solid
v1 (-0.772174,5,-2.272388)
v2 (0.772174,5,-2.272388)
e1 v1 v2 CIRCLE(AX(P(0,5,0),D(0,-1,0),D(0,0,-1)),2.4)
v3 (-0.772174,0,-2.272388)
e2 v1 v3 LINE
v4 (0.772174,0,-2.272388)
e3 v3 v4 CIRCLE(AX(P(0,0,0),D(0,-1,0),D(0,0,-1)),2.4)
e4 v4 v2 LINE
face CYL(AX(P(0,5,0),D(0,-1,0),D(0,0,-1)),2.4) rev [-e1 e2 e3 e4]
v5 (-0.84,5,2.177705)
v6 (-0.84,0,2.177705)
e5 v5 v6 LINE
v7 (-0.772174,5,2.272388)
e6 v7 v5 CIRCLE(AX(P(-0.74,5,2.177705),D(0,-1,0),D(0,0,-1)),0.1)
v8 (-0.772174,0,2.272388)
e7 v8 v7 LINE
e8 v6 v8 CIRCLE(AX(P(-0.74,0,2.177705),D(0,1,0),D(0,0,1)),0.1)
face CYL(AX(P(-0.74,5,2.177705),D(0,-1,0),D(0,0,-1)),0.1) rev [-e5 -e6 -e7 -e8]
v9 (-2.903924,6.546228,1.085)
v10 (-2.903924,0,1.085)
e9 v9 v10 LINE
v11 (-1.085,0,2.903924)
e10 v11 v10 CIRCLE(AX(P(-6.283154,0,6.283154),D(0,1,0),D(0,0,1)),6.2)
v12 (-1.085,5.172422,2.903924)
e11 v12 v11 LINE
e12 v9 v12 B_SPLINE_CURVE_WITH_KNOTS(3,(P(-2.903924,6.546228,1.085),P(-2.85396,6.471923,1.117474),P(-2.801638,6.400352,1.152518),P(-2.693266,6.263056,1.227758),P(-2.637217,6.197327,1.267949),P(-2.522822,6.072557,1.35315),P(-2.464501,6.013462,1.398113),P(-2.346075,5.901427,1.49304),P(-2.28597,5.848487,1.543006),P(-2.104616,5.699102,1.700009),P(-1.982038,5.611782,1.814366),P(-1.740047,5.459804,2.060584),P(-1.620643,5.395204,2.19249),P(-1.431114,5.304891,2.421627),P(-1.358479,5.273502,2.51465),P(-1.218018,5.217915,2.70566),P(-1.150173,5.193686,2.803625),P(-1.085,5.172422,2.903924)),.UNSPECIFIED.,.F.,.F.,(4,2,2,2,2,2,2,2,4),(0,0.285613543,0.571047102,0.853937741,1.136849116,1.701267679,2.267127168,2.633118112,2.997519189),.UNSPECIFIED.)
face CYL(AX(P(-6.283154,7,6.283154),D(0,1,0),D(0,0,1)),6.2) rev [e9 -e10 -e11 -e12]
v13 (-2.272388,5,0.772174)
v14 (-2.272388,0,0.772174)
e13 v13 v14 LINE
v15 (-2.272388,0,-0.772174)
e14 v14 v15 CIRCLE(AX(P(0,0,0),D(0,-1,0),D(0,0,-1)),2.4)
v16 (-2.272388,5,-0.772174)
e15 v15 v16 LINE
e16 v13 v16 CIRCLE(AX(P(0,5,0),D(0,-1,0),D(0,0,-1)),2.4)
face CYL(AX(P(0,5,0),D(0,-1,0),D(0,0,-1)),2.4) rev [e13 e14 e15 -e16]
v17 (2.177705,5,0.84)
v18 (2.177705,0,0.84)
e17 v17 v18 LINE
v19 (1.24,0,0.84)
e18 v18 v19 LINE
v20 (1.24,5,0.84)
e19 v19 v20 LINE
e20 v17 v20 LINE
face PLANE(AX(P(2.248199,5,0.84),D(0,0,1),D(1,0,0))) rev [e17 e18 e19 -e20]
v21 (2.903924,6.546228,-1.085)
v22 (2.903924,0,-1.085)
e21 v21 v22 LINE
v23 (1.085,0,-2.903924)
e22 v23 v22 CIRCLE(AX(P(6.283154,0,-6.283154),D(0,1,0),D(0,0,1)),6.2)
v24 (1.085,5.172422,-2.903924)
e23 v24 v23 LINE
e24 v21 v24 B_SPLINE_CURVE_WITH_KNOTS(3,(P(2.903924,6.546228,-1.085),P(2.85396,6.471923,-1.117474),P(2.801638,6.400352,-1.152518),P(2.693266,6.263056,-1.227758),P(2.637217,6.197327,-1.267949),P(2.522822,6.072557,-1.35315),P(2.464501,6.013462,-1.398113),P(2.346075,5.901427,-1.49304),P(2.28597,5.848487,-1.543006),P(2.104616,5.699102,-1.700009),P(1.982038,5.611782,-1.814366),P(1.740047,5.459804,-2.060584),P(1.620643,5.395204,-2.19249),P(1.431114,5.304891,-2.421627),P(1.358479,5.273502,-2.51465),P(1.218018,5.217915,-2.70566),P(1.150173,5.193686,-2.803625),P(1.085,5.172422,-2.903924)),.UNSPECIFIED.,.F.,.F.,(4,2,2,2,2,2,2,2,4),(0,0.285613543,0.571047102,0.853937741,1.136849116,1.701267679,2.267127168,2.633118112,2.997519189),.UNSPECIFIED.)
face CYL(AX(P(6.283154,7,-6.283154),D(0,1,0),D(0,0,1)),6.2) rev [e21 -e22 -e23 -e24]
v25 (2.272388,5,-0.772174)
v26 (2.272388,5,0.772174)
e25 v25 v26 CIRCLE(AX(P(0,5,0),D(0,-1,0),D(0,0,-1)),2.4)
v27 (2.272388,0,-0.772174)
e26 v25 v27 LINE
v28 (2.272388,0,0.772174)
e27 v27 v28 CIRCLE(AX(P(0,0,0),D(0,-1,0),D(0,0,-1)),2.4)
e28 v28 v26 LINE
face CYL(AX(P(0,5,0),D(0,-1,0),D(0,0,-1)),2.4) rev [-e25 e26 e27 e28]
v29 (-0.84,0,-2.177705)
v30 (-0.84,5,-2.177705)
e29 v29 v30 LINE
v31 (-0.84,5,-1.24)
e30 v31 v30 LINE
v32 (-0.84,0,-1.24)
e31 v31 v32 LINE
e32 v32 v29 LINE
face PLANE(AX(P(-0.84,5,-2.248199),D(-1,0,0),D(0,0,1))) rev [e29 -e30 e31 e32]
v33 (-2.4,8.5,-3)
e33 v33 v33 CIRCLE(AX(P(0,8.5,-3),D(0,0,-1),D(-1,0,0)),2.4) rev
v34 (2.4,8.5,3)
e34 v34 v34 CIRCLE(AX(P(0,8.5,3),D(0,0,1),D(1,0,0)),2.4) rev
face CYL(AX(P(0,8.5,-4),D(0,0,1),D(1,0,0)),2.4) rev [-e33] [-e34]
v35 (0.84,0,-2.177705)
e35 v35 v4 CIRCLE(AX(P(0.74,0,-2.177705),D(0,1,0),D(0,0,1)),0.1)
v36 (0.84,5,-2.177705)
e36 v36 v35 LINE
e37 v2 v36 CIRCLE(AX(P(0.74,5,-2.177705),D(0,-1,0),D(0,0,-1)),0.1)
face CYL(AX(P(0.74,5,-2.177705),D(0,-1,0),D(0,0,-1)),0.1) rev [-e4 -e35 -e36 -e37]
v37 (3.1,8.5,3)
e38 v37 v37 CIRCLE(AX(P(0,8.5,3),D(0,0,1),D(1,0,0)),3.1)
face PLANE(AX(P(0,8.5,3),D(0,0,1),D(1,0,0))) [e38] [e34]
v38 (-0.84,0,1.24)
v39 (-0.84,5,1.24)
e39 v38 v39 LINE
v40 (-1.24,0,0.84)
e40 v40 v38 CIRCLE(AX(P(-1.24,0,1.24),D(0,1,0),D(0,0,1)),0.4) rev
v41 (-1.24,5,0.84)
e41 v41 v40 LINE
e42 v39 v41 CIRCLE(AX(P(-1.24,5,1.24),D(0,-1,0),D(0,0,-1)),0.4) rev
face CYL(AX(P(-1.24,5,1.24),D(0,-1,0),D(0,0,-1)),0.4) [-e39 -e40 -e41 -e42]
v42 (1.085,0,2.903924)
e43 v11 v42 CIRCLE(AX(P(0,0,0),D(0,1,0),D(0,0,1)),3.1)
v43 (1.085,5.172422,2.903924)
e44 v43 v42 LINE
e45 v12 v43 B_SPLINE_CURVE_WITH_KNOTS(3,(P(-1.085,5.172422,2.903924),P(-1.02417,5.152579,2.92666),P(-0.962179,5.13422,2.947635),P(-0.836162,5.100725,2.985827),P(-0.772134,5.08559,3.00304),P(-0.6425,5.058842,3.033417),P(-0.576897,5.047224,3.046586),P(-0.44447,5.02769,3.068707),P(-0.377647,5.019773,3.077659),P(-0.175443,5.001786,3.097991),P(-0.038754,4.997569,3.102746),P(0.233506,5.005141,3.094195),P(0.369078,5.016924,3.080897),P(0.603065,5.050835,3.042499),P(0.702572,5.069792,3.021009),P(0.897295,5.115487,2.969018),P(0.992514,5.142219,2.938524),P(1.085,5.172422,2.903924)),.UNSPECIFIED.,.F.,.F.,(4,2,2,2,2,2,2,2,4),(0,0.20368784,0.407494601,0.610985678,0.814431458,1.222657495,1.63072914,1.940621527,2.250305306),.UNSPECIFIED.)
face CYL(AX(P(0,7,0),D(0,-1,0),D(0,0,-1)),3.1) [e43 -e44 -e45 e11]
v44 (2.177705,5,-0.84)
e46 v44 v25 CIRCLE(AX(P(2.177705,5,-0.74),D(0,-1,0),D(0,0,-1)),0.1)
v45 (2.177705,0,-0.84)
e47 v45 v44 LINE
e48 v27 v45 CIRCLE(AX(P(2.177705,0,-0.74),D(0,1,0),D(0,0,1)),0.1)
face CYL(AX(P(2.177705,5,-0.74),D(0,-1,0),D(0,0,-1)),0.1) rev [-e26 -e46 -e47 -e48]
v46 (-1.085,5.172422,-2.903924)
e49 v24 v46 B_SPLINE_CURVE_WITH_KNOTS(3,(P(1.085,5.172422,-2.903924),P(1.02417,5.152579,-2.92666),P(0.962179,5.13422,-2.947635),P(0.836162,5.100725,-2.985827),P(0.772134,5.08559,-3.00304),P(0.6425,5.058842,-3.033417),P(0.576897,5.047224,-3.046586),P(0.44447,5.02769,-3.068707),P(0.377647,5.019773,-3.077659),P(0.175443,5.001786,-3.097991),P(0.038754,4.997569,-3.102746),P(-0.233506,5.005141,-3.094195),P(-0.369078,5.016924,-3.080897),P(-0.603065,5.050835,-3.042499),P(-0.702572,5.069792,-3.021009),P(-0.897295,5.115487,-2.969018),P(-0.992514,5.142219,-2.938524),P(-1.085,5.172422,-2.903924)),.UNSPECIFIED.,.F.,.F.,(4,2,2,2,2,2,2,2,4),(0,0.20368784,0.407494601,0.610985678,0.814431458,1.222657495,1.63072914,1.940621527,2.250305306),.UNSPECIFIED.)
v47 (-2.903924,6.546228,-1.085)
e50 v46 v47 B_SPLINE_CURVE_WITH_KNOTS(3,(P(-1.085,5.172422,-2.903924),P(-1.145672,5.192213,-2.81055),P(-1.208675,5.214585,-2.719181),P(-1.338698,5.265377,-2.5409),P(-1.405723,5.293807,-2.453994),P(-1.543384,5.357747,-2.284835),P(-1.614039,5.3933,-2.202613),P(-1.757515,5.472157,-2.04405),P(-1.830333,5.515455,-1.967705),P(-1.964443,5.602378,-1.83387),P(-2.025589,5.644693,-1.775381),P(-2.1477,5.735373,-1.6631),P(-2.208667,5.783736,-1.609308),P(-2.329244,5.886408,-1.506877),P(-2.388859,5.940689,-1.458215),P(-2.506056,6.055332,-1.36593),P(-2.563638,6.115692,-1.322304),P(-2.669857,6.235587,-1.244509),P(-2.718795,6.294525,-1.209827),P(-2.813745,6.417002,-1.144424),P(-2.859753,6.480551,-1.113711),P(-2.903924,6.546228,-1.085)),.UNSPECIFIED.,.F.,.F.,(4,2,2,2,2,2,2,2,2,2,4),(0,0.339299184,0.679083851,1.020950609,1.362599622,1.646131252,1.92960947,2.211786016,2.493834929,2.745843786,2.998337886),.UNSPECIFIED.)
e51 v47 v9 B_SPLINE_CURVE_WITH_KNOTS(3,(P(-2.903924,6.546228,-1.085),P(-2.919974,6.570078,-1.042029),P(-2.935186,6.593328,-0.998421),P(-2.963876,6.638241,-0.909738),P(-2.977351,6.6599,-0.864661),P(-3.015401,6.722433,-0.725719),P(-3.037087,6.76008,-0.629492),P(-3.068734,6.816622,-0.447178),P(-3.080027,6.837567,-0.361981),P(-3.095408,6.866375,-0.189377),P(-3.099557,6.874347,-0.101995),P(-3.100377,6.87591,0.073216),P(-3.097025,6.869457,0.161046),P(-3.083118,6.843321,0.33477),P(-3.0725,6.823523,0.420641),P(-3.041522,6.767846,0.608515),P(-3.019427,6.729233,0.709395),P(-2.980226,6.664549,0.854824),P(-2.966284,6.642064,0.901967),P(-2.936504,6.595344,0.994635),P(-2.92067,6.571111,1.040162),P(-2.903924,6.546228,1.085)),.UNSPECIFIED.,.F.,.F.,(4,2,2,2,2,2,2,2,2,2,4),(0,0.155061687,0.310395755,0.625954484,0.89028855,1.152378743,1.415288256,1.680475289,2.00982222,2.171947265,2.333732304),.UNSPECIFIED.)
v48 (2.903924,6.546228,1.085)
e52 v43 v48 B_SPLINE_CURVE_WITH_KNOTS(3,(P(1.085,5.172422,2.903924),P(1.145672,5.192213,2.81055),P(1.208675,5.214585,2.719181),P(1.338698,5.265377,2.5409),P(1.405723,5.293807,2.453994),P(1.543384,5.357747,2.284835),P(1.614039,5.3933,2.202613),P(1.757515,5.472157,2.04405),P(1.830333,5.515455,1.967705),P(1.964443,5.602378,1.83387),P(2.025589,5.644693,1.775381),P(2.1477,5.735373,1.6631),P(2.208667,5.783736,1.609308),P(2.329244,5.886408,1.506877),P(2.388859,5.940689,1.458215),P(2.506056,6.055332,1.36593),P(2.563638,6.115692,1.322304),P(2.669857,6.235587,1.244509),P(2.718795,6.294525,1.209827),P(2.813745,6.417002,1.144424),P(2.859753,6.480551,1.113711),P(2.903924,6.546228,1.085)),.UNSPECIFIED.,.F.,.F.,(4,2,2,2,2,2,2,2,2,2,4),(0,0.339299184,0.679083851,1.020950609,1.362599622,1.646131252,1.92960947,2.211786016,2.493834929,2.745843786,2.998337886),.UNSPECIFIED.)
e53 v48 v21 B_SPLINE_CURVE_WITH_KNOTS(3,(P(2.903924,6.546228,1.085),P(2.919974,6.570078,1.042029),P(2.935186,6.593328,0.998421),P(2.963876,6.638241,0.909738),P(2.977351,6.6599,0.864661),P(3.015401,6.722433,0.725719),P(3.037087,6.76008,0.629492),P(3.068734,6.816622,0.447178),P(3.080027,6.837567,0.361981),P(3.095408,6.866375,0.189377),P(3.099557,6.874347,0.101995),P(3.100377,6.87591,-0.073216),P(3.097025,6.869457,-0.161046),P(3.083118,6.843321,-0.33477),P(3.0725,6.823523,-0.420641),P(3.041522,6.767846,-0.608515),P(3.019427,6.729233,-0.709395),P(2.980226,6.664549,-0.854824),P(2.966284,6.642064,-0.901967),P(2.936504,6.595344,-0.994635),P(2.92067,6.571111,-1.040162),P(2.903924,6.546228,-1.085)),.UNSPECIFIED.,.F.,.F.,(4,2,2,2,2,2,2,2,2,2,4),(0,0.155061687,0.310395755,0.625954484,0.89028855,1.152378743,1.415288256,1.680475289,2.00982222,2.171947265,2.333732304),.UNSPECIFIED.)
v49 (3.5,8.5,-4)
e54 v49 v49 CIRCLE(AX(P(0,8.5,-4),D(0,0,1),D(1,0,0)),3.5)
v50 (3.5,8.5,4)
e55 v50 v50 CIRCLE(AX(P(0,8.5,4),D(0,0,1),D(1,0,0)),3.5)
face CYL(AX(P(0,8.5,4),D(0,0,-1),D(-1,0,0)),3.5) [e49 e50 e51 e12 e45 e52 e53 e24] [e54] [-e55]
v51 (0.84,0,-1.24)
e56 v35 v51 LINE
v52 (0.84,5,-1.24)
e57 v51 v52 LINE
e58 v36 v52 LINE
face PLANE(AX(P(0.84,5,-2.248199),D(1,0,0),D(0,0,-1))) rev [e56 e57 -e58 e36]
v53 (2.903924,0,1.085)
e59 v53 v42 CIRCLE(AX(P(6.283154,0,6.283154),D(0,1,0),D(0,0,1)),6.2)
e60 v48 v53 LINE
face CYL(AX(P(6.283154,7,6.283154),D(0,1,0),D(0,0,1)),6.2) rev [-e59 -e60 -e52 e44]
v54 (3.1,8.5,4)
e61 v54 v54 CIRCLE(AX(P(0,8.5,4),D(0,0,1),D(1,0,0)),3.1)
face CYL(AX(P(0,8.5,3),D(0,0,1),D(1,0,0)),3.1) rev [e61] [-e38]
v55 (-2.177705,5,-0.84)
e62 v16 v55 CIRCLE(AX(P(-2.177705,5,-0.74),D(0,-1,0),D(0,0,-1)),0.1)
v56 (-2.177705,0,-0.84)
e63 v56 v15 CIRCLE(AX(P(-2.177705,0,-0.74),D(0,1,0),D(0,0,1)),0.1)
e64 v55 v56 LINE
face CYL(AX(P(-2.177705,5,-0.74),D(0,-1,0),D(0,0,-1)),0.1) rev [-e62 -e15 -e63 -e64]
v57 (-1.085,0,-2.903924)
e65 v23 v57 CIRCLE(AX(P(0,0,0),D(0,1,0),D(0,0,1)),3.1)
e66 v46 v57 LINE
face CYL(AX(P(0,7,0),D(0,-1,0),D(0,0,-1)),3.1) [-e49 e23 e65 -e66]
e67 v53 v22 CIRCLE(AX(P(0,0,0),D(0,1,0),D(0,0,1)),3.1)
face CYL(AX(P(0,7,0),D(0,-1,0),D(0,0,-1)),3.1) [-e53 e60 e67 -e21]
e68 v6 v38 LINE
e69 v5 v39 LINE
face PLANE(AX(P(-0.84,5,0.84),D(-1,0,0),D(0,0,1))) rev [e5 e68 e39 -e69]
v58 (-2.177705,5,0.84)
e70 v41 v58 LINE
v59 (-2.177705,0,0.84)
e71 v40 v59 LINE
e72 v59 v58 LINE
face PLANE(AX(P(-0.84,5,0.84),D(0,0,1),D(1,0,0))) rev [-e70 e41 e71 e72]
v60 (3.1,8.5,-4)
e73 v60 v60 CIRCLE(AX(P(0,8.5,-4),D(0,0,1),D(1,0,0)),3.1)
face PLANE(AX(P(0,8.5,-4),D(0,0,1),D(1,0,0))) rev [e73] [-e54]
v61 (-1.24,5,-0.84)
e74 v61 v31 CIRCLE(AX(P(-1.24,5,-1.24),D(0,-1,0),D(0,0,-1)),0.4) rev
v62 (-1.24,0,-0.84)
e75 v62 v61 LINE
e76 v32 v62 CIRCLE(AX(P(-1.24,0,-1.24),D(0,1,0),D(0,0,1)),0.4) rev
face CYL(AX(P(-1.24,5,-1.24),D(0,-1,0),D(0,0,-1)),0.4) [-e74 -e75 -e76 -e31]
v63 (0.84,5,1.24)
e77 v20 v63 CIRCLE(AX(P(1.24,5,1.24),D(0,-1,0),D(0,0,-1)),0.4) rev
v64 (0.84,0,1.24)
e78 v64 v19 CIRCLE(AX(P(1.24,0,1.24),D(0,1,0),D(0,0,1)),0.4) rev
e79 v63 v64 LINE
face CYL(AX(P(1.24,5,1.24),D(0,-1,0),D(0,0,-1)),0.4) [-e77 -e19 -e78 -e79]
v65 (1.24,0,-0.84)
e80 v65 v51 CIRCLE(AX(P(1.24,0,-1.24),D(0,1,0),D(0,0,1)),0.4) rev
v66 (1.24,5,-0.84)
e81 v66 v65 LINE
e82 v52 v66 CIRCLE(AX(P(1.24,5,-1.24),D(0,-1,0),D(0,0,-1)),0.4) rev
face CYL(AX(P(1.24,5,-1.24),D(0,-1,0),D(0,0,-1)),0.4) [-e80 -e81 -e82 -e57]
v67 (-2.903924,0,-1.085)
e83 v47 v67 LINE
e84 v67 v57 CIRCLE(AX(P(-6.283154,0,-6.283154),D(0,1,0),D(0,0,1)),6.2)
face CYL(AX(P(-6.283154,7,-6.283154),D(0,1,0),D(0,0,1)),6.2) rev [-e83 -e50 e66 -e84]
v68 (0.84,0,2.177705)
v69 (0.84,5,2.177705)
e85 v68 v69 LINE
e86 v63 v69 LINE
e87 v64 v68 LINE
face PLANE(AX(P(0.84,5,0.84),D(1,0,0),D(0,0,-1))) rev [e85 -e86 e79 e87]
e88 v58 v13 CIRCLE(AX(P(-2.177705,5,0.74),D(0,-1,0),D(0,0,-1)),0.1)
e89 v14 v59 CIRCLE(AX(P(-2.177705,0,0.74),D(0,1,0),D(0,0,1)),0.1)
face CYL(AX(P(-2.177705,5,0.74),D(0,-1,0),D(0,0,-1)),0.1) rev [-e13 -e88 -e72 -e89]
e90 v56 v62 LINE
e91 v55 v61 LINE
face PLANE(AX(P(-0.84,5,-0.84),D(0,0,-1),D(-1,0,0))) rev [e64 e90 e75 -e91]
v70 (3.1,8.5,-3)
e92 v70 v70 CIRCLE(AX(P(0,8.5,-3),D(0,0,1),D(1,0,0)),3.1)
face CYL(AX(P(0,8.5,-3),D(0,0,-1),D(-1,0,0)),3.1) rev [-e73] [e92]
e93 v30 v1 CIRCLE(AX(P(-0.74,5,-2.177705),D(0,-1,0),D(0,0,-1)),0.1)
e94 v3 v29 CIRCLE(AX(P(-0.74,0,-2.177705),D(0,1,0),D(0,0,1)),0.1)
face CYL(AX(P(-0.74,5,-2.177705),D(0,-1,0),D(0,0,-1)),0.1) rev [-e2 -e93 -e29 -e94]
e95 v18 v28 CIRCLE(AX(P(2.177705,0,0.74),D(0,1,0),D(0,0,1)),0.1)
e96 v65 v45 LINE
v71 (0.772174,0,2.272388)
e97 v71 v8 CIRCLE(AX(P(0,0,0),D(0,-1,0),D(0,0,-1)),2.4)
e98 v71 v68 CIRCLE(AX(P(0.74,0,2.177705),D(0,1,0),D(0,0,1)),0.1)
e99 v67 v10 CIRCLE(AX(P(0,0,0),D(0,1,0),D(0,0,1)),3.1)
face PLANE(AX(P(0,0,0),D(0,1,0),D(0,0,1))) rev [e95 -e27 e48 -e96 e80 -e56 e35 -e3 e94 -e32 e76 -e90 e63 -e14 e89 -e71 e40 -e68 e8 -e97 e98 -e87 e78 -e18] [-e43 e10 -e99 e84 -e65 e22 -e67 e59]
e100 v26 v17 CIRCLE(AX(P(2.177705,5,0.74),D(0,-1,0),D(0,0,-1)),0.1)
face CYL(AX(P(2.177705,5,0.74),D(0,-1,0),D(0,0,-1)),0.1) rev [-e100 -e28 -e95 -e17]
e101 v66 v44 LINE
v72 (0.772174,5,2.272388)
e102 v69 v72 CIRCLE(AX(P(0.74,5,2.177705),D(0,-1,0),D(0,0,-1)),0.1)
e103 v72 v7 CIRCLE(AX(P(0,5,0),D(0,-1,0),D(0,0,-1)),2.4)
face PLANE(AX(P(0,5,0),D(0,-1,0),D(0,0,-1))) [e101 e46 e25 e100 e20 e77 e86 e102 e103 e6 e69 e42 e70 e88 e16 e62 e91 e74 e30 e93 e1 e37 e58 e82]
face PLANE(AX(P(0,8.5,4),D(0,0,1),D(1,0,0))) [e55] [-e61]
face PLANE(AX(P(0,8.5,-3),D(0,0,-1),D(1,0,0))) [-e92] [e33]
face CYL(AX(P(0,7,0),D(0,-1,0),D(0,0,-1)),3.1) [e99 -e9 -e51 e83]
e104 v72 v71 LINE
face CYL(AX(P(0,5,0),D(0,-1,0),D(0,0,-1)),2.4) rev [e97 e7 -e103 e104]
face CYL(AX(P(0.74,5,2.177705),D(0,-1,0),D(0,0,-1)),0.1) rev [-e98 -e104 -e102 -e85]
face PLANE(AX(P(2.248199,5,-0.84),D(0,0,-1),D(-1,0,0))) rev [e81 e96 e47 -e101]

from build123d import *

# Parameters (mm, degrees)
BOSS_EXTRUDE1_DEPTH = 7
FILLET1_R           = 6.2
FILLET2_R           = 6.2
FILLET3_R           = 6.2
FILLET4_R           = 6.2
CUT_EXTRUDE1_DEPTH  = 5
SKETCH5_R           = 3.5
BOSS_EXTRUDE2_DEPTH = 4
SKETCH9_R           = 2.4
CUT_EXTRUDE2_DEPTH  = 15.840822238
SKETCH10_R          = 3.1
CUT_EXTRUDE3_DEPTH  = 1
FILLET5_R           = 0.4
FILLET6_R           = 0.4
FILLET7_R           = 0.4
FILLET8_R           = 0.4
FILLET9_R           = 0.1
FILLET10_R          = 0.1
FILLET11_R          = 0.1
FILLET12_R          = 0.1
FILLET13_R          = 0.1
FILLET14_R          = 0.1
FILLET15_R          = 0.1
FILLET16_R          = 0.1


with BuildPart() as part:
    # Sketch2 → Boss-Extrude1 (new body)
    with BuildSketch(Plane(origin=(0, 0, 0), x_dir=(1, 0, 0), z_dir=(0, 1, 0))):
        with BuildLine():
            Line((-1.085, -1.085), (-1.085, -2.903924069))
            ThreePointArc((-1.085, -2.903924069), (0, -3.1), (1.085, -2.903924069))
            Line((1.085, -2.903924069), (1.085, -1.085))
            Line((1.085, -1.085), (2.903924069, -1.085))
            ThreePointArc((2.903924069, -1.085), (3.1, 0), (2.903924069, 1.085))
            Line((2.903924069, 1.085), (1.085, 1.085))
            Line((1.085, 1.085), (1.085, 2.903924069))
            ThreePointArc((1.085, 2.903924069), (0, 3.1), (-1.085, 2.903924069))
            Line((-1.085, 2.903924069), (-1.085, 1.085))
            Line((-1.085, 1.085), (-2.903924069, 1.085))
            ThreePointArc((-2.903924069, 1.085), (-3.1, 0), (-2.903924069, -1.085))
            Line((-2.903924069, -1.085), (-1.085, -1.085))
        make_face()
    extrude(amount=BOSS_EXTRUDE1_DEPTH)

    # Fillet1
    # the kernel refuses this fillet: 6.2 mm, written as the material it adds along each edge
    with BuildSketch(Plane(origin=(-1.085, 0, -1.085), x_dir=(0, 0, -1), z_dir=(0, 1, 0))) as fillet1_piece_1:
        with BuildLine():
            CenterArc((5.198154004, 5.198154004), FILLET1_R, 213.027198012, 23.945603977)
            Line((0, 1.818924069), (0, 0))
            Line((0, 0), (1.818924069, 0))
        make_face()
    extrude(amount=7)

    # Fillet2
    # the kernel refuses this fillet: 6.2 mm, written as the material it adds along each edge
    with BuildSketch(Plane(origin=(1.085, 0, -1.085), x_dir=(0, 0, -1), z_dir=(0, 1, 0))) as fillet2_piece_1:
        with BuildLine():
            CenterArc((5.198154004, -5.198154004), FILLET2_R, 123.027198012, 23.945603977)
            Line((0, -1.818924069), (0, 0))
            Line((0, 0), (1.818924069, 0))
        make_face()
    extrude(amount=7)

    # Fillet3
    # the kernel refuses this fillet: 6.2 mm, written as the material it adds along each edge
    with BuildSketch(Plane(origin=(1.085, 0, 1.085), x_dir=(1, 0, 0), z_dir=(0, 1, 0))) as fillet3_piece_1:
        with BuildLine():
            CenterArc((5.198154004, -5.198154004), FILLET3_R, 123.027198012, 23.945603977)
            Line((0, -1.818924069), (0, 0))
            Line((0, 0), (1.818924069, 0))
        make_face()
    extrude(amount=7)

    # Fillet4
    # the kernel refuses this fillet: 6.2 mm, written as the material it adds along each edge
    with BuildSketch(Plane(origin=(-1.085, 0, 1.085), x_dir=(0, 0, 1), z_dir=(0, 1, 0))) as fillet4_piece_1:
        with BuildLine():
            CenterArc((5.198154004, -5.198154004), FILLET4_R, 123.027198012, 23.945603977)
            Line((0, -1.818924069), (0, 0))
            Line((0, 0), (1.818924069, 0))
        make_face()
    extrude(amount=7)

    # Sketch4 → Cut-Extrude1 (cut)
    with BuildSketch(Plane.XZ):
        with BuildLine():
            Line((0.84, 0.84), (0.84, 2.248199279))
            ThreePointArc((0.84, 2.248199279), (0, 2.4), (-0.84, 2.248199279))
            Line((-0.84, 2.248199279), (-0.84, 0.84))
            Line((-0.84, 0.84), (-2.248199279, 0.84))
            ThreePointArc((-2.248199279, 0.84), (-2.4, 0), (-2.248199279, -0.84))
            Line((-2.248199279, -0.84), (-0.84, -0.84))
            Line((-0.84, -0.84), (-0.84, -2.248199279))
            ThreePointArc((-0.84, -2.248199279), (0, -2.4), (0.84, -2.248199279))
            Line((0.84, -2.248199279), (0.84, -0.84))
            Line((0.84, -0.84), (2.248199279, -0.84))
            ThreePointArc((2.248199279, -0.84), (2.4, 0), (2.248199279, 0.84))
            Line((2.248199279, 0.84), (0.84, 0.84))
        make_face()
    extrude(amount=-CUT_EXTRUDE1_DEPTH, mode=Mode.SUBTRACT)

    # Sketch5 → Boss-Extrude2 (add, symmetric)
    with BuildSketch(Plane.XY):
        with Locations((0, 8.5)):
            Circle(SKETCH5_R)
    extrude(amount=BOSS_EXTRUDE2_DEPTH, both=True)

    # Sketch9 → Cut-Extrude2 (cut, through all)
    with BuildSketch(Plane.XY.offset(4)):
        with Locations((0, 8.5)):
            Circle(SKETCH9_R)
    extrude(amount=-CUT_EXTRUDE2_DEPTH, mode=Mode.SUBTRACT)

    # Sketch10 → Cut-Extrude3 (cut)
    with BuildSketch(Plane.XY.offset(4)):
        with Locations((0, 8.5)):
            Circle(SKETCH10_R)
    cut_extrude3 = extrude(amount=-CUT_EXTRUDE3_DEPTH, mode=Mode.SUBTRACT)

    # Mirror1: Cut-Extrude3 across plane
    add(cut_extrude3.mirror(Plane.XY), mode=Mode.SUBTRACT)

    # Fillet5
    fillet5_edges = [part.edges().sort_by_distance(p)[0] for p in [
        (0.84, 2.5, 0.84),
    ]]
    fillet(fillet5_edges, radius=FILLET5_R)

    # Fillet6
    fillet6_edges = [part.edges().sort_by_distance(p)[0] for p in [
        (-0.84, 2.5, 0.84),
    ]]
    fillet(fillet6_edges, radius=FILLET6_R)

    # Fillet7
    fillet7_edges = [part.edges().sort_by_distance(p)[0] for p in [
        (-0.84, 2.5, -0.84),
    ]]
    fillet(fillet7_edges, radius=FILLET7_R)

    # Fillet8
    fillet8_edges = [part.edges().sort_by_distance(p)[0] for p in [
        (0.84, 2.5, -0.84),
    ]]
    fillet(fillet8_edges, radius=FILLET8_R)

    # Fillet9
    fillet9_edges = [part.edges().sort_by_distance(p)[0] for p in [
        (-0.84, 2.5, 2.248199279),
    ]]
    fillet(fillet9_edges, radius=FILLET9_R)

    # Fillet10
    fillet10_edges = [part.edges().sort_by_distance(p)[0] for p in [
        (0.84, 2.5, 2.248199279),
    ]]
    fillet(fillet10_edges, radius=FILLET10_R)

    # Fillet11
    fillet11_edges = [part.edges().sort_by_distance(p)[0] for p in [
        (-2.248199279, 2.5, -0.84),
    ]]
    fillet(fillet11_edges, radius=FILLET11_R)

    # Fillet12
    fillet12_edges = [part.edges().sort_by_distance(p)[0] for p in [
        (-2.248199279, 2.5, 0.84),
    ]]
    fillet(fillet12_edges, radius=FILLET12_R)

    # Fillet13
    fillet13_edges = [part.edges().sort_by_distance(p)[0] for p in [
        (2.248199279, 2.5, 0.84),
    ]]
    fillet(fillet13_edges, radius=FILLET13_R)

    # Fillet14
    fillet14_edges = [part.edges().sort_by_distance(p)[0] for p in [
        (2.248199279, 2.5, -0.84),
    ]]
    fillet(fillet14_edges, radius=FILLET14_R)

    # Fillet15
    fillet15_edges = [part.edges().sort_by_distance(p)[0] for p in [
        (-0.84, 2.5, -2.248199279),
    ]]
    fillet(fillet15_edges, radius=FILLET15_R)

    # Fillet16
    fillet16_edges = [part.edges().sort_by_distance(p)[0] for p in [
        (0.84, 2.5, -2.248199279),
    ]]
    fillet(fillet16_edges, radius=FILLET16_R)


solid = part.part
